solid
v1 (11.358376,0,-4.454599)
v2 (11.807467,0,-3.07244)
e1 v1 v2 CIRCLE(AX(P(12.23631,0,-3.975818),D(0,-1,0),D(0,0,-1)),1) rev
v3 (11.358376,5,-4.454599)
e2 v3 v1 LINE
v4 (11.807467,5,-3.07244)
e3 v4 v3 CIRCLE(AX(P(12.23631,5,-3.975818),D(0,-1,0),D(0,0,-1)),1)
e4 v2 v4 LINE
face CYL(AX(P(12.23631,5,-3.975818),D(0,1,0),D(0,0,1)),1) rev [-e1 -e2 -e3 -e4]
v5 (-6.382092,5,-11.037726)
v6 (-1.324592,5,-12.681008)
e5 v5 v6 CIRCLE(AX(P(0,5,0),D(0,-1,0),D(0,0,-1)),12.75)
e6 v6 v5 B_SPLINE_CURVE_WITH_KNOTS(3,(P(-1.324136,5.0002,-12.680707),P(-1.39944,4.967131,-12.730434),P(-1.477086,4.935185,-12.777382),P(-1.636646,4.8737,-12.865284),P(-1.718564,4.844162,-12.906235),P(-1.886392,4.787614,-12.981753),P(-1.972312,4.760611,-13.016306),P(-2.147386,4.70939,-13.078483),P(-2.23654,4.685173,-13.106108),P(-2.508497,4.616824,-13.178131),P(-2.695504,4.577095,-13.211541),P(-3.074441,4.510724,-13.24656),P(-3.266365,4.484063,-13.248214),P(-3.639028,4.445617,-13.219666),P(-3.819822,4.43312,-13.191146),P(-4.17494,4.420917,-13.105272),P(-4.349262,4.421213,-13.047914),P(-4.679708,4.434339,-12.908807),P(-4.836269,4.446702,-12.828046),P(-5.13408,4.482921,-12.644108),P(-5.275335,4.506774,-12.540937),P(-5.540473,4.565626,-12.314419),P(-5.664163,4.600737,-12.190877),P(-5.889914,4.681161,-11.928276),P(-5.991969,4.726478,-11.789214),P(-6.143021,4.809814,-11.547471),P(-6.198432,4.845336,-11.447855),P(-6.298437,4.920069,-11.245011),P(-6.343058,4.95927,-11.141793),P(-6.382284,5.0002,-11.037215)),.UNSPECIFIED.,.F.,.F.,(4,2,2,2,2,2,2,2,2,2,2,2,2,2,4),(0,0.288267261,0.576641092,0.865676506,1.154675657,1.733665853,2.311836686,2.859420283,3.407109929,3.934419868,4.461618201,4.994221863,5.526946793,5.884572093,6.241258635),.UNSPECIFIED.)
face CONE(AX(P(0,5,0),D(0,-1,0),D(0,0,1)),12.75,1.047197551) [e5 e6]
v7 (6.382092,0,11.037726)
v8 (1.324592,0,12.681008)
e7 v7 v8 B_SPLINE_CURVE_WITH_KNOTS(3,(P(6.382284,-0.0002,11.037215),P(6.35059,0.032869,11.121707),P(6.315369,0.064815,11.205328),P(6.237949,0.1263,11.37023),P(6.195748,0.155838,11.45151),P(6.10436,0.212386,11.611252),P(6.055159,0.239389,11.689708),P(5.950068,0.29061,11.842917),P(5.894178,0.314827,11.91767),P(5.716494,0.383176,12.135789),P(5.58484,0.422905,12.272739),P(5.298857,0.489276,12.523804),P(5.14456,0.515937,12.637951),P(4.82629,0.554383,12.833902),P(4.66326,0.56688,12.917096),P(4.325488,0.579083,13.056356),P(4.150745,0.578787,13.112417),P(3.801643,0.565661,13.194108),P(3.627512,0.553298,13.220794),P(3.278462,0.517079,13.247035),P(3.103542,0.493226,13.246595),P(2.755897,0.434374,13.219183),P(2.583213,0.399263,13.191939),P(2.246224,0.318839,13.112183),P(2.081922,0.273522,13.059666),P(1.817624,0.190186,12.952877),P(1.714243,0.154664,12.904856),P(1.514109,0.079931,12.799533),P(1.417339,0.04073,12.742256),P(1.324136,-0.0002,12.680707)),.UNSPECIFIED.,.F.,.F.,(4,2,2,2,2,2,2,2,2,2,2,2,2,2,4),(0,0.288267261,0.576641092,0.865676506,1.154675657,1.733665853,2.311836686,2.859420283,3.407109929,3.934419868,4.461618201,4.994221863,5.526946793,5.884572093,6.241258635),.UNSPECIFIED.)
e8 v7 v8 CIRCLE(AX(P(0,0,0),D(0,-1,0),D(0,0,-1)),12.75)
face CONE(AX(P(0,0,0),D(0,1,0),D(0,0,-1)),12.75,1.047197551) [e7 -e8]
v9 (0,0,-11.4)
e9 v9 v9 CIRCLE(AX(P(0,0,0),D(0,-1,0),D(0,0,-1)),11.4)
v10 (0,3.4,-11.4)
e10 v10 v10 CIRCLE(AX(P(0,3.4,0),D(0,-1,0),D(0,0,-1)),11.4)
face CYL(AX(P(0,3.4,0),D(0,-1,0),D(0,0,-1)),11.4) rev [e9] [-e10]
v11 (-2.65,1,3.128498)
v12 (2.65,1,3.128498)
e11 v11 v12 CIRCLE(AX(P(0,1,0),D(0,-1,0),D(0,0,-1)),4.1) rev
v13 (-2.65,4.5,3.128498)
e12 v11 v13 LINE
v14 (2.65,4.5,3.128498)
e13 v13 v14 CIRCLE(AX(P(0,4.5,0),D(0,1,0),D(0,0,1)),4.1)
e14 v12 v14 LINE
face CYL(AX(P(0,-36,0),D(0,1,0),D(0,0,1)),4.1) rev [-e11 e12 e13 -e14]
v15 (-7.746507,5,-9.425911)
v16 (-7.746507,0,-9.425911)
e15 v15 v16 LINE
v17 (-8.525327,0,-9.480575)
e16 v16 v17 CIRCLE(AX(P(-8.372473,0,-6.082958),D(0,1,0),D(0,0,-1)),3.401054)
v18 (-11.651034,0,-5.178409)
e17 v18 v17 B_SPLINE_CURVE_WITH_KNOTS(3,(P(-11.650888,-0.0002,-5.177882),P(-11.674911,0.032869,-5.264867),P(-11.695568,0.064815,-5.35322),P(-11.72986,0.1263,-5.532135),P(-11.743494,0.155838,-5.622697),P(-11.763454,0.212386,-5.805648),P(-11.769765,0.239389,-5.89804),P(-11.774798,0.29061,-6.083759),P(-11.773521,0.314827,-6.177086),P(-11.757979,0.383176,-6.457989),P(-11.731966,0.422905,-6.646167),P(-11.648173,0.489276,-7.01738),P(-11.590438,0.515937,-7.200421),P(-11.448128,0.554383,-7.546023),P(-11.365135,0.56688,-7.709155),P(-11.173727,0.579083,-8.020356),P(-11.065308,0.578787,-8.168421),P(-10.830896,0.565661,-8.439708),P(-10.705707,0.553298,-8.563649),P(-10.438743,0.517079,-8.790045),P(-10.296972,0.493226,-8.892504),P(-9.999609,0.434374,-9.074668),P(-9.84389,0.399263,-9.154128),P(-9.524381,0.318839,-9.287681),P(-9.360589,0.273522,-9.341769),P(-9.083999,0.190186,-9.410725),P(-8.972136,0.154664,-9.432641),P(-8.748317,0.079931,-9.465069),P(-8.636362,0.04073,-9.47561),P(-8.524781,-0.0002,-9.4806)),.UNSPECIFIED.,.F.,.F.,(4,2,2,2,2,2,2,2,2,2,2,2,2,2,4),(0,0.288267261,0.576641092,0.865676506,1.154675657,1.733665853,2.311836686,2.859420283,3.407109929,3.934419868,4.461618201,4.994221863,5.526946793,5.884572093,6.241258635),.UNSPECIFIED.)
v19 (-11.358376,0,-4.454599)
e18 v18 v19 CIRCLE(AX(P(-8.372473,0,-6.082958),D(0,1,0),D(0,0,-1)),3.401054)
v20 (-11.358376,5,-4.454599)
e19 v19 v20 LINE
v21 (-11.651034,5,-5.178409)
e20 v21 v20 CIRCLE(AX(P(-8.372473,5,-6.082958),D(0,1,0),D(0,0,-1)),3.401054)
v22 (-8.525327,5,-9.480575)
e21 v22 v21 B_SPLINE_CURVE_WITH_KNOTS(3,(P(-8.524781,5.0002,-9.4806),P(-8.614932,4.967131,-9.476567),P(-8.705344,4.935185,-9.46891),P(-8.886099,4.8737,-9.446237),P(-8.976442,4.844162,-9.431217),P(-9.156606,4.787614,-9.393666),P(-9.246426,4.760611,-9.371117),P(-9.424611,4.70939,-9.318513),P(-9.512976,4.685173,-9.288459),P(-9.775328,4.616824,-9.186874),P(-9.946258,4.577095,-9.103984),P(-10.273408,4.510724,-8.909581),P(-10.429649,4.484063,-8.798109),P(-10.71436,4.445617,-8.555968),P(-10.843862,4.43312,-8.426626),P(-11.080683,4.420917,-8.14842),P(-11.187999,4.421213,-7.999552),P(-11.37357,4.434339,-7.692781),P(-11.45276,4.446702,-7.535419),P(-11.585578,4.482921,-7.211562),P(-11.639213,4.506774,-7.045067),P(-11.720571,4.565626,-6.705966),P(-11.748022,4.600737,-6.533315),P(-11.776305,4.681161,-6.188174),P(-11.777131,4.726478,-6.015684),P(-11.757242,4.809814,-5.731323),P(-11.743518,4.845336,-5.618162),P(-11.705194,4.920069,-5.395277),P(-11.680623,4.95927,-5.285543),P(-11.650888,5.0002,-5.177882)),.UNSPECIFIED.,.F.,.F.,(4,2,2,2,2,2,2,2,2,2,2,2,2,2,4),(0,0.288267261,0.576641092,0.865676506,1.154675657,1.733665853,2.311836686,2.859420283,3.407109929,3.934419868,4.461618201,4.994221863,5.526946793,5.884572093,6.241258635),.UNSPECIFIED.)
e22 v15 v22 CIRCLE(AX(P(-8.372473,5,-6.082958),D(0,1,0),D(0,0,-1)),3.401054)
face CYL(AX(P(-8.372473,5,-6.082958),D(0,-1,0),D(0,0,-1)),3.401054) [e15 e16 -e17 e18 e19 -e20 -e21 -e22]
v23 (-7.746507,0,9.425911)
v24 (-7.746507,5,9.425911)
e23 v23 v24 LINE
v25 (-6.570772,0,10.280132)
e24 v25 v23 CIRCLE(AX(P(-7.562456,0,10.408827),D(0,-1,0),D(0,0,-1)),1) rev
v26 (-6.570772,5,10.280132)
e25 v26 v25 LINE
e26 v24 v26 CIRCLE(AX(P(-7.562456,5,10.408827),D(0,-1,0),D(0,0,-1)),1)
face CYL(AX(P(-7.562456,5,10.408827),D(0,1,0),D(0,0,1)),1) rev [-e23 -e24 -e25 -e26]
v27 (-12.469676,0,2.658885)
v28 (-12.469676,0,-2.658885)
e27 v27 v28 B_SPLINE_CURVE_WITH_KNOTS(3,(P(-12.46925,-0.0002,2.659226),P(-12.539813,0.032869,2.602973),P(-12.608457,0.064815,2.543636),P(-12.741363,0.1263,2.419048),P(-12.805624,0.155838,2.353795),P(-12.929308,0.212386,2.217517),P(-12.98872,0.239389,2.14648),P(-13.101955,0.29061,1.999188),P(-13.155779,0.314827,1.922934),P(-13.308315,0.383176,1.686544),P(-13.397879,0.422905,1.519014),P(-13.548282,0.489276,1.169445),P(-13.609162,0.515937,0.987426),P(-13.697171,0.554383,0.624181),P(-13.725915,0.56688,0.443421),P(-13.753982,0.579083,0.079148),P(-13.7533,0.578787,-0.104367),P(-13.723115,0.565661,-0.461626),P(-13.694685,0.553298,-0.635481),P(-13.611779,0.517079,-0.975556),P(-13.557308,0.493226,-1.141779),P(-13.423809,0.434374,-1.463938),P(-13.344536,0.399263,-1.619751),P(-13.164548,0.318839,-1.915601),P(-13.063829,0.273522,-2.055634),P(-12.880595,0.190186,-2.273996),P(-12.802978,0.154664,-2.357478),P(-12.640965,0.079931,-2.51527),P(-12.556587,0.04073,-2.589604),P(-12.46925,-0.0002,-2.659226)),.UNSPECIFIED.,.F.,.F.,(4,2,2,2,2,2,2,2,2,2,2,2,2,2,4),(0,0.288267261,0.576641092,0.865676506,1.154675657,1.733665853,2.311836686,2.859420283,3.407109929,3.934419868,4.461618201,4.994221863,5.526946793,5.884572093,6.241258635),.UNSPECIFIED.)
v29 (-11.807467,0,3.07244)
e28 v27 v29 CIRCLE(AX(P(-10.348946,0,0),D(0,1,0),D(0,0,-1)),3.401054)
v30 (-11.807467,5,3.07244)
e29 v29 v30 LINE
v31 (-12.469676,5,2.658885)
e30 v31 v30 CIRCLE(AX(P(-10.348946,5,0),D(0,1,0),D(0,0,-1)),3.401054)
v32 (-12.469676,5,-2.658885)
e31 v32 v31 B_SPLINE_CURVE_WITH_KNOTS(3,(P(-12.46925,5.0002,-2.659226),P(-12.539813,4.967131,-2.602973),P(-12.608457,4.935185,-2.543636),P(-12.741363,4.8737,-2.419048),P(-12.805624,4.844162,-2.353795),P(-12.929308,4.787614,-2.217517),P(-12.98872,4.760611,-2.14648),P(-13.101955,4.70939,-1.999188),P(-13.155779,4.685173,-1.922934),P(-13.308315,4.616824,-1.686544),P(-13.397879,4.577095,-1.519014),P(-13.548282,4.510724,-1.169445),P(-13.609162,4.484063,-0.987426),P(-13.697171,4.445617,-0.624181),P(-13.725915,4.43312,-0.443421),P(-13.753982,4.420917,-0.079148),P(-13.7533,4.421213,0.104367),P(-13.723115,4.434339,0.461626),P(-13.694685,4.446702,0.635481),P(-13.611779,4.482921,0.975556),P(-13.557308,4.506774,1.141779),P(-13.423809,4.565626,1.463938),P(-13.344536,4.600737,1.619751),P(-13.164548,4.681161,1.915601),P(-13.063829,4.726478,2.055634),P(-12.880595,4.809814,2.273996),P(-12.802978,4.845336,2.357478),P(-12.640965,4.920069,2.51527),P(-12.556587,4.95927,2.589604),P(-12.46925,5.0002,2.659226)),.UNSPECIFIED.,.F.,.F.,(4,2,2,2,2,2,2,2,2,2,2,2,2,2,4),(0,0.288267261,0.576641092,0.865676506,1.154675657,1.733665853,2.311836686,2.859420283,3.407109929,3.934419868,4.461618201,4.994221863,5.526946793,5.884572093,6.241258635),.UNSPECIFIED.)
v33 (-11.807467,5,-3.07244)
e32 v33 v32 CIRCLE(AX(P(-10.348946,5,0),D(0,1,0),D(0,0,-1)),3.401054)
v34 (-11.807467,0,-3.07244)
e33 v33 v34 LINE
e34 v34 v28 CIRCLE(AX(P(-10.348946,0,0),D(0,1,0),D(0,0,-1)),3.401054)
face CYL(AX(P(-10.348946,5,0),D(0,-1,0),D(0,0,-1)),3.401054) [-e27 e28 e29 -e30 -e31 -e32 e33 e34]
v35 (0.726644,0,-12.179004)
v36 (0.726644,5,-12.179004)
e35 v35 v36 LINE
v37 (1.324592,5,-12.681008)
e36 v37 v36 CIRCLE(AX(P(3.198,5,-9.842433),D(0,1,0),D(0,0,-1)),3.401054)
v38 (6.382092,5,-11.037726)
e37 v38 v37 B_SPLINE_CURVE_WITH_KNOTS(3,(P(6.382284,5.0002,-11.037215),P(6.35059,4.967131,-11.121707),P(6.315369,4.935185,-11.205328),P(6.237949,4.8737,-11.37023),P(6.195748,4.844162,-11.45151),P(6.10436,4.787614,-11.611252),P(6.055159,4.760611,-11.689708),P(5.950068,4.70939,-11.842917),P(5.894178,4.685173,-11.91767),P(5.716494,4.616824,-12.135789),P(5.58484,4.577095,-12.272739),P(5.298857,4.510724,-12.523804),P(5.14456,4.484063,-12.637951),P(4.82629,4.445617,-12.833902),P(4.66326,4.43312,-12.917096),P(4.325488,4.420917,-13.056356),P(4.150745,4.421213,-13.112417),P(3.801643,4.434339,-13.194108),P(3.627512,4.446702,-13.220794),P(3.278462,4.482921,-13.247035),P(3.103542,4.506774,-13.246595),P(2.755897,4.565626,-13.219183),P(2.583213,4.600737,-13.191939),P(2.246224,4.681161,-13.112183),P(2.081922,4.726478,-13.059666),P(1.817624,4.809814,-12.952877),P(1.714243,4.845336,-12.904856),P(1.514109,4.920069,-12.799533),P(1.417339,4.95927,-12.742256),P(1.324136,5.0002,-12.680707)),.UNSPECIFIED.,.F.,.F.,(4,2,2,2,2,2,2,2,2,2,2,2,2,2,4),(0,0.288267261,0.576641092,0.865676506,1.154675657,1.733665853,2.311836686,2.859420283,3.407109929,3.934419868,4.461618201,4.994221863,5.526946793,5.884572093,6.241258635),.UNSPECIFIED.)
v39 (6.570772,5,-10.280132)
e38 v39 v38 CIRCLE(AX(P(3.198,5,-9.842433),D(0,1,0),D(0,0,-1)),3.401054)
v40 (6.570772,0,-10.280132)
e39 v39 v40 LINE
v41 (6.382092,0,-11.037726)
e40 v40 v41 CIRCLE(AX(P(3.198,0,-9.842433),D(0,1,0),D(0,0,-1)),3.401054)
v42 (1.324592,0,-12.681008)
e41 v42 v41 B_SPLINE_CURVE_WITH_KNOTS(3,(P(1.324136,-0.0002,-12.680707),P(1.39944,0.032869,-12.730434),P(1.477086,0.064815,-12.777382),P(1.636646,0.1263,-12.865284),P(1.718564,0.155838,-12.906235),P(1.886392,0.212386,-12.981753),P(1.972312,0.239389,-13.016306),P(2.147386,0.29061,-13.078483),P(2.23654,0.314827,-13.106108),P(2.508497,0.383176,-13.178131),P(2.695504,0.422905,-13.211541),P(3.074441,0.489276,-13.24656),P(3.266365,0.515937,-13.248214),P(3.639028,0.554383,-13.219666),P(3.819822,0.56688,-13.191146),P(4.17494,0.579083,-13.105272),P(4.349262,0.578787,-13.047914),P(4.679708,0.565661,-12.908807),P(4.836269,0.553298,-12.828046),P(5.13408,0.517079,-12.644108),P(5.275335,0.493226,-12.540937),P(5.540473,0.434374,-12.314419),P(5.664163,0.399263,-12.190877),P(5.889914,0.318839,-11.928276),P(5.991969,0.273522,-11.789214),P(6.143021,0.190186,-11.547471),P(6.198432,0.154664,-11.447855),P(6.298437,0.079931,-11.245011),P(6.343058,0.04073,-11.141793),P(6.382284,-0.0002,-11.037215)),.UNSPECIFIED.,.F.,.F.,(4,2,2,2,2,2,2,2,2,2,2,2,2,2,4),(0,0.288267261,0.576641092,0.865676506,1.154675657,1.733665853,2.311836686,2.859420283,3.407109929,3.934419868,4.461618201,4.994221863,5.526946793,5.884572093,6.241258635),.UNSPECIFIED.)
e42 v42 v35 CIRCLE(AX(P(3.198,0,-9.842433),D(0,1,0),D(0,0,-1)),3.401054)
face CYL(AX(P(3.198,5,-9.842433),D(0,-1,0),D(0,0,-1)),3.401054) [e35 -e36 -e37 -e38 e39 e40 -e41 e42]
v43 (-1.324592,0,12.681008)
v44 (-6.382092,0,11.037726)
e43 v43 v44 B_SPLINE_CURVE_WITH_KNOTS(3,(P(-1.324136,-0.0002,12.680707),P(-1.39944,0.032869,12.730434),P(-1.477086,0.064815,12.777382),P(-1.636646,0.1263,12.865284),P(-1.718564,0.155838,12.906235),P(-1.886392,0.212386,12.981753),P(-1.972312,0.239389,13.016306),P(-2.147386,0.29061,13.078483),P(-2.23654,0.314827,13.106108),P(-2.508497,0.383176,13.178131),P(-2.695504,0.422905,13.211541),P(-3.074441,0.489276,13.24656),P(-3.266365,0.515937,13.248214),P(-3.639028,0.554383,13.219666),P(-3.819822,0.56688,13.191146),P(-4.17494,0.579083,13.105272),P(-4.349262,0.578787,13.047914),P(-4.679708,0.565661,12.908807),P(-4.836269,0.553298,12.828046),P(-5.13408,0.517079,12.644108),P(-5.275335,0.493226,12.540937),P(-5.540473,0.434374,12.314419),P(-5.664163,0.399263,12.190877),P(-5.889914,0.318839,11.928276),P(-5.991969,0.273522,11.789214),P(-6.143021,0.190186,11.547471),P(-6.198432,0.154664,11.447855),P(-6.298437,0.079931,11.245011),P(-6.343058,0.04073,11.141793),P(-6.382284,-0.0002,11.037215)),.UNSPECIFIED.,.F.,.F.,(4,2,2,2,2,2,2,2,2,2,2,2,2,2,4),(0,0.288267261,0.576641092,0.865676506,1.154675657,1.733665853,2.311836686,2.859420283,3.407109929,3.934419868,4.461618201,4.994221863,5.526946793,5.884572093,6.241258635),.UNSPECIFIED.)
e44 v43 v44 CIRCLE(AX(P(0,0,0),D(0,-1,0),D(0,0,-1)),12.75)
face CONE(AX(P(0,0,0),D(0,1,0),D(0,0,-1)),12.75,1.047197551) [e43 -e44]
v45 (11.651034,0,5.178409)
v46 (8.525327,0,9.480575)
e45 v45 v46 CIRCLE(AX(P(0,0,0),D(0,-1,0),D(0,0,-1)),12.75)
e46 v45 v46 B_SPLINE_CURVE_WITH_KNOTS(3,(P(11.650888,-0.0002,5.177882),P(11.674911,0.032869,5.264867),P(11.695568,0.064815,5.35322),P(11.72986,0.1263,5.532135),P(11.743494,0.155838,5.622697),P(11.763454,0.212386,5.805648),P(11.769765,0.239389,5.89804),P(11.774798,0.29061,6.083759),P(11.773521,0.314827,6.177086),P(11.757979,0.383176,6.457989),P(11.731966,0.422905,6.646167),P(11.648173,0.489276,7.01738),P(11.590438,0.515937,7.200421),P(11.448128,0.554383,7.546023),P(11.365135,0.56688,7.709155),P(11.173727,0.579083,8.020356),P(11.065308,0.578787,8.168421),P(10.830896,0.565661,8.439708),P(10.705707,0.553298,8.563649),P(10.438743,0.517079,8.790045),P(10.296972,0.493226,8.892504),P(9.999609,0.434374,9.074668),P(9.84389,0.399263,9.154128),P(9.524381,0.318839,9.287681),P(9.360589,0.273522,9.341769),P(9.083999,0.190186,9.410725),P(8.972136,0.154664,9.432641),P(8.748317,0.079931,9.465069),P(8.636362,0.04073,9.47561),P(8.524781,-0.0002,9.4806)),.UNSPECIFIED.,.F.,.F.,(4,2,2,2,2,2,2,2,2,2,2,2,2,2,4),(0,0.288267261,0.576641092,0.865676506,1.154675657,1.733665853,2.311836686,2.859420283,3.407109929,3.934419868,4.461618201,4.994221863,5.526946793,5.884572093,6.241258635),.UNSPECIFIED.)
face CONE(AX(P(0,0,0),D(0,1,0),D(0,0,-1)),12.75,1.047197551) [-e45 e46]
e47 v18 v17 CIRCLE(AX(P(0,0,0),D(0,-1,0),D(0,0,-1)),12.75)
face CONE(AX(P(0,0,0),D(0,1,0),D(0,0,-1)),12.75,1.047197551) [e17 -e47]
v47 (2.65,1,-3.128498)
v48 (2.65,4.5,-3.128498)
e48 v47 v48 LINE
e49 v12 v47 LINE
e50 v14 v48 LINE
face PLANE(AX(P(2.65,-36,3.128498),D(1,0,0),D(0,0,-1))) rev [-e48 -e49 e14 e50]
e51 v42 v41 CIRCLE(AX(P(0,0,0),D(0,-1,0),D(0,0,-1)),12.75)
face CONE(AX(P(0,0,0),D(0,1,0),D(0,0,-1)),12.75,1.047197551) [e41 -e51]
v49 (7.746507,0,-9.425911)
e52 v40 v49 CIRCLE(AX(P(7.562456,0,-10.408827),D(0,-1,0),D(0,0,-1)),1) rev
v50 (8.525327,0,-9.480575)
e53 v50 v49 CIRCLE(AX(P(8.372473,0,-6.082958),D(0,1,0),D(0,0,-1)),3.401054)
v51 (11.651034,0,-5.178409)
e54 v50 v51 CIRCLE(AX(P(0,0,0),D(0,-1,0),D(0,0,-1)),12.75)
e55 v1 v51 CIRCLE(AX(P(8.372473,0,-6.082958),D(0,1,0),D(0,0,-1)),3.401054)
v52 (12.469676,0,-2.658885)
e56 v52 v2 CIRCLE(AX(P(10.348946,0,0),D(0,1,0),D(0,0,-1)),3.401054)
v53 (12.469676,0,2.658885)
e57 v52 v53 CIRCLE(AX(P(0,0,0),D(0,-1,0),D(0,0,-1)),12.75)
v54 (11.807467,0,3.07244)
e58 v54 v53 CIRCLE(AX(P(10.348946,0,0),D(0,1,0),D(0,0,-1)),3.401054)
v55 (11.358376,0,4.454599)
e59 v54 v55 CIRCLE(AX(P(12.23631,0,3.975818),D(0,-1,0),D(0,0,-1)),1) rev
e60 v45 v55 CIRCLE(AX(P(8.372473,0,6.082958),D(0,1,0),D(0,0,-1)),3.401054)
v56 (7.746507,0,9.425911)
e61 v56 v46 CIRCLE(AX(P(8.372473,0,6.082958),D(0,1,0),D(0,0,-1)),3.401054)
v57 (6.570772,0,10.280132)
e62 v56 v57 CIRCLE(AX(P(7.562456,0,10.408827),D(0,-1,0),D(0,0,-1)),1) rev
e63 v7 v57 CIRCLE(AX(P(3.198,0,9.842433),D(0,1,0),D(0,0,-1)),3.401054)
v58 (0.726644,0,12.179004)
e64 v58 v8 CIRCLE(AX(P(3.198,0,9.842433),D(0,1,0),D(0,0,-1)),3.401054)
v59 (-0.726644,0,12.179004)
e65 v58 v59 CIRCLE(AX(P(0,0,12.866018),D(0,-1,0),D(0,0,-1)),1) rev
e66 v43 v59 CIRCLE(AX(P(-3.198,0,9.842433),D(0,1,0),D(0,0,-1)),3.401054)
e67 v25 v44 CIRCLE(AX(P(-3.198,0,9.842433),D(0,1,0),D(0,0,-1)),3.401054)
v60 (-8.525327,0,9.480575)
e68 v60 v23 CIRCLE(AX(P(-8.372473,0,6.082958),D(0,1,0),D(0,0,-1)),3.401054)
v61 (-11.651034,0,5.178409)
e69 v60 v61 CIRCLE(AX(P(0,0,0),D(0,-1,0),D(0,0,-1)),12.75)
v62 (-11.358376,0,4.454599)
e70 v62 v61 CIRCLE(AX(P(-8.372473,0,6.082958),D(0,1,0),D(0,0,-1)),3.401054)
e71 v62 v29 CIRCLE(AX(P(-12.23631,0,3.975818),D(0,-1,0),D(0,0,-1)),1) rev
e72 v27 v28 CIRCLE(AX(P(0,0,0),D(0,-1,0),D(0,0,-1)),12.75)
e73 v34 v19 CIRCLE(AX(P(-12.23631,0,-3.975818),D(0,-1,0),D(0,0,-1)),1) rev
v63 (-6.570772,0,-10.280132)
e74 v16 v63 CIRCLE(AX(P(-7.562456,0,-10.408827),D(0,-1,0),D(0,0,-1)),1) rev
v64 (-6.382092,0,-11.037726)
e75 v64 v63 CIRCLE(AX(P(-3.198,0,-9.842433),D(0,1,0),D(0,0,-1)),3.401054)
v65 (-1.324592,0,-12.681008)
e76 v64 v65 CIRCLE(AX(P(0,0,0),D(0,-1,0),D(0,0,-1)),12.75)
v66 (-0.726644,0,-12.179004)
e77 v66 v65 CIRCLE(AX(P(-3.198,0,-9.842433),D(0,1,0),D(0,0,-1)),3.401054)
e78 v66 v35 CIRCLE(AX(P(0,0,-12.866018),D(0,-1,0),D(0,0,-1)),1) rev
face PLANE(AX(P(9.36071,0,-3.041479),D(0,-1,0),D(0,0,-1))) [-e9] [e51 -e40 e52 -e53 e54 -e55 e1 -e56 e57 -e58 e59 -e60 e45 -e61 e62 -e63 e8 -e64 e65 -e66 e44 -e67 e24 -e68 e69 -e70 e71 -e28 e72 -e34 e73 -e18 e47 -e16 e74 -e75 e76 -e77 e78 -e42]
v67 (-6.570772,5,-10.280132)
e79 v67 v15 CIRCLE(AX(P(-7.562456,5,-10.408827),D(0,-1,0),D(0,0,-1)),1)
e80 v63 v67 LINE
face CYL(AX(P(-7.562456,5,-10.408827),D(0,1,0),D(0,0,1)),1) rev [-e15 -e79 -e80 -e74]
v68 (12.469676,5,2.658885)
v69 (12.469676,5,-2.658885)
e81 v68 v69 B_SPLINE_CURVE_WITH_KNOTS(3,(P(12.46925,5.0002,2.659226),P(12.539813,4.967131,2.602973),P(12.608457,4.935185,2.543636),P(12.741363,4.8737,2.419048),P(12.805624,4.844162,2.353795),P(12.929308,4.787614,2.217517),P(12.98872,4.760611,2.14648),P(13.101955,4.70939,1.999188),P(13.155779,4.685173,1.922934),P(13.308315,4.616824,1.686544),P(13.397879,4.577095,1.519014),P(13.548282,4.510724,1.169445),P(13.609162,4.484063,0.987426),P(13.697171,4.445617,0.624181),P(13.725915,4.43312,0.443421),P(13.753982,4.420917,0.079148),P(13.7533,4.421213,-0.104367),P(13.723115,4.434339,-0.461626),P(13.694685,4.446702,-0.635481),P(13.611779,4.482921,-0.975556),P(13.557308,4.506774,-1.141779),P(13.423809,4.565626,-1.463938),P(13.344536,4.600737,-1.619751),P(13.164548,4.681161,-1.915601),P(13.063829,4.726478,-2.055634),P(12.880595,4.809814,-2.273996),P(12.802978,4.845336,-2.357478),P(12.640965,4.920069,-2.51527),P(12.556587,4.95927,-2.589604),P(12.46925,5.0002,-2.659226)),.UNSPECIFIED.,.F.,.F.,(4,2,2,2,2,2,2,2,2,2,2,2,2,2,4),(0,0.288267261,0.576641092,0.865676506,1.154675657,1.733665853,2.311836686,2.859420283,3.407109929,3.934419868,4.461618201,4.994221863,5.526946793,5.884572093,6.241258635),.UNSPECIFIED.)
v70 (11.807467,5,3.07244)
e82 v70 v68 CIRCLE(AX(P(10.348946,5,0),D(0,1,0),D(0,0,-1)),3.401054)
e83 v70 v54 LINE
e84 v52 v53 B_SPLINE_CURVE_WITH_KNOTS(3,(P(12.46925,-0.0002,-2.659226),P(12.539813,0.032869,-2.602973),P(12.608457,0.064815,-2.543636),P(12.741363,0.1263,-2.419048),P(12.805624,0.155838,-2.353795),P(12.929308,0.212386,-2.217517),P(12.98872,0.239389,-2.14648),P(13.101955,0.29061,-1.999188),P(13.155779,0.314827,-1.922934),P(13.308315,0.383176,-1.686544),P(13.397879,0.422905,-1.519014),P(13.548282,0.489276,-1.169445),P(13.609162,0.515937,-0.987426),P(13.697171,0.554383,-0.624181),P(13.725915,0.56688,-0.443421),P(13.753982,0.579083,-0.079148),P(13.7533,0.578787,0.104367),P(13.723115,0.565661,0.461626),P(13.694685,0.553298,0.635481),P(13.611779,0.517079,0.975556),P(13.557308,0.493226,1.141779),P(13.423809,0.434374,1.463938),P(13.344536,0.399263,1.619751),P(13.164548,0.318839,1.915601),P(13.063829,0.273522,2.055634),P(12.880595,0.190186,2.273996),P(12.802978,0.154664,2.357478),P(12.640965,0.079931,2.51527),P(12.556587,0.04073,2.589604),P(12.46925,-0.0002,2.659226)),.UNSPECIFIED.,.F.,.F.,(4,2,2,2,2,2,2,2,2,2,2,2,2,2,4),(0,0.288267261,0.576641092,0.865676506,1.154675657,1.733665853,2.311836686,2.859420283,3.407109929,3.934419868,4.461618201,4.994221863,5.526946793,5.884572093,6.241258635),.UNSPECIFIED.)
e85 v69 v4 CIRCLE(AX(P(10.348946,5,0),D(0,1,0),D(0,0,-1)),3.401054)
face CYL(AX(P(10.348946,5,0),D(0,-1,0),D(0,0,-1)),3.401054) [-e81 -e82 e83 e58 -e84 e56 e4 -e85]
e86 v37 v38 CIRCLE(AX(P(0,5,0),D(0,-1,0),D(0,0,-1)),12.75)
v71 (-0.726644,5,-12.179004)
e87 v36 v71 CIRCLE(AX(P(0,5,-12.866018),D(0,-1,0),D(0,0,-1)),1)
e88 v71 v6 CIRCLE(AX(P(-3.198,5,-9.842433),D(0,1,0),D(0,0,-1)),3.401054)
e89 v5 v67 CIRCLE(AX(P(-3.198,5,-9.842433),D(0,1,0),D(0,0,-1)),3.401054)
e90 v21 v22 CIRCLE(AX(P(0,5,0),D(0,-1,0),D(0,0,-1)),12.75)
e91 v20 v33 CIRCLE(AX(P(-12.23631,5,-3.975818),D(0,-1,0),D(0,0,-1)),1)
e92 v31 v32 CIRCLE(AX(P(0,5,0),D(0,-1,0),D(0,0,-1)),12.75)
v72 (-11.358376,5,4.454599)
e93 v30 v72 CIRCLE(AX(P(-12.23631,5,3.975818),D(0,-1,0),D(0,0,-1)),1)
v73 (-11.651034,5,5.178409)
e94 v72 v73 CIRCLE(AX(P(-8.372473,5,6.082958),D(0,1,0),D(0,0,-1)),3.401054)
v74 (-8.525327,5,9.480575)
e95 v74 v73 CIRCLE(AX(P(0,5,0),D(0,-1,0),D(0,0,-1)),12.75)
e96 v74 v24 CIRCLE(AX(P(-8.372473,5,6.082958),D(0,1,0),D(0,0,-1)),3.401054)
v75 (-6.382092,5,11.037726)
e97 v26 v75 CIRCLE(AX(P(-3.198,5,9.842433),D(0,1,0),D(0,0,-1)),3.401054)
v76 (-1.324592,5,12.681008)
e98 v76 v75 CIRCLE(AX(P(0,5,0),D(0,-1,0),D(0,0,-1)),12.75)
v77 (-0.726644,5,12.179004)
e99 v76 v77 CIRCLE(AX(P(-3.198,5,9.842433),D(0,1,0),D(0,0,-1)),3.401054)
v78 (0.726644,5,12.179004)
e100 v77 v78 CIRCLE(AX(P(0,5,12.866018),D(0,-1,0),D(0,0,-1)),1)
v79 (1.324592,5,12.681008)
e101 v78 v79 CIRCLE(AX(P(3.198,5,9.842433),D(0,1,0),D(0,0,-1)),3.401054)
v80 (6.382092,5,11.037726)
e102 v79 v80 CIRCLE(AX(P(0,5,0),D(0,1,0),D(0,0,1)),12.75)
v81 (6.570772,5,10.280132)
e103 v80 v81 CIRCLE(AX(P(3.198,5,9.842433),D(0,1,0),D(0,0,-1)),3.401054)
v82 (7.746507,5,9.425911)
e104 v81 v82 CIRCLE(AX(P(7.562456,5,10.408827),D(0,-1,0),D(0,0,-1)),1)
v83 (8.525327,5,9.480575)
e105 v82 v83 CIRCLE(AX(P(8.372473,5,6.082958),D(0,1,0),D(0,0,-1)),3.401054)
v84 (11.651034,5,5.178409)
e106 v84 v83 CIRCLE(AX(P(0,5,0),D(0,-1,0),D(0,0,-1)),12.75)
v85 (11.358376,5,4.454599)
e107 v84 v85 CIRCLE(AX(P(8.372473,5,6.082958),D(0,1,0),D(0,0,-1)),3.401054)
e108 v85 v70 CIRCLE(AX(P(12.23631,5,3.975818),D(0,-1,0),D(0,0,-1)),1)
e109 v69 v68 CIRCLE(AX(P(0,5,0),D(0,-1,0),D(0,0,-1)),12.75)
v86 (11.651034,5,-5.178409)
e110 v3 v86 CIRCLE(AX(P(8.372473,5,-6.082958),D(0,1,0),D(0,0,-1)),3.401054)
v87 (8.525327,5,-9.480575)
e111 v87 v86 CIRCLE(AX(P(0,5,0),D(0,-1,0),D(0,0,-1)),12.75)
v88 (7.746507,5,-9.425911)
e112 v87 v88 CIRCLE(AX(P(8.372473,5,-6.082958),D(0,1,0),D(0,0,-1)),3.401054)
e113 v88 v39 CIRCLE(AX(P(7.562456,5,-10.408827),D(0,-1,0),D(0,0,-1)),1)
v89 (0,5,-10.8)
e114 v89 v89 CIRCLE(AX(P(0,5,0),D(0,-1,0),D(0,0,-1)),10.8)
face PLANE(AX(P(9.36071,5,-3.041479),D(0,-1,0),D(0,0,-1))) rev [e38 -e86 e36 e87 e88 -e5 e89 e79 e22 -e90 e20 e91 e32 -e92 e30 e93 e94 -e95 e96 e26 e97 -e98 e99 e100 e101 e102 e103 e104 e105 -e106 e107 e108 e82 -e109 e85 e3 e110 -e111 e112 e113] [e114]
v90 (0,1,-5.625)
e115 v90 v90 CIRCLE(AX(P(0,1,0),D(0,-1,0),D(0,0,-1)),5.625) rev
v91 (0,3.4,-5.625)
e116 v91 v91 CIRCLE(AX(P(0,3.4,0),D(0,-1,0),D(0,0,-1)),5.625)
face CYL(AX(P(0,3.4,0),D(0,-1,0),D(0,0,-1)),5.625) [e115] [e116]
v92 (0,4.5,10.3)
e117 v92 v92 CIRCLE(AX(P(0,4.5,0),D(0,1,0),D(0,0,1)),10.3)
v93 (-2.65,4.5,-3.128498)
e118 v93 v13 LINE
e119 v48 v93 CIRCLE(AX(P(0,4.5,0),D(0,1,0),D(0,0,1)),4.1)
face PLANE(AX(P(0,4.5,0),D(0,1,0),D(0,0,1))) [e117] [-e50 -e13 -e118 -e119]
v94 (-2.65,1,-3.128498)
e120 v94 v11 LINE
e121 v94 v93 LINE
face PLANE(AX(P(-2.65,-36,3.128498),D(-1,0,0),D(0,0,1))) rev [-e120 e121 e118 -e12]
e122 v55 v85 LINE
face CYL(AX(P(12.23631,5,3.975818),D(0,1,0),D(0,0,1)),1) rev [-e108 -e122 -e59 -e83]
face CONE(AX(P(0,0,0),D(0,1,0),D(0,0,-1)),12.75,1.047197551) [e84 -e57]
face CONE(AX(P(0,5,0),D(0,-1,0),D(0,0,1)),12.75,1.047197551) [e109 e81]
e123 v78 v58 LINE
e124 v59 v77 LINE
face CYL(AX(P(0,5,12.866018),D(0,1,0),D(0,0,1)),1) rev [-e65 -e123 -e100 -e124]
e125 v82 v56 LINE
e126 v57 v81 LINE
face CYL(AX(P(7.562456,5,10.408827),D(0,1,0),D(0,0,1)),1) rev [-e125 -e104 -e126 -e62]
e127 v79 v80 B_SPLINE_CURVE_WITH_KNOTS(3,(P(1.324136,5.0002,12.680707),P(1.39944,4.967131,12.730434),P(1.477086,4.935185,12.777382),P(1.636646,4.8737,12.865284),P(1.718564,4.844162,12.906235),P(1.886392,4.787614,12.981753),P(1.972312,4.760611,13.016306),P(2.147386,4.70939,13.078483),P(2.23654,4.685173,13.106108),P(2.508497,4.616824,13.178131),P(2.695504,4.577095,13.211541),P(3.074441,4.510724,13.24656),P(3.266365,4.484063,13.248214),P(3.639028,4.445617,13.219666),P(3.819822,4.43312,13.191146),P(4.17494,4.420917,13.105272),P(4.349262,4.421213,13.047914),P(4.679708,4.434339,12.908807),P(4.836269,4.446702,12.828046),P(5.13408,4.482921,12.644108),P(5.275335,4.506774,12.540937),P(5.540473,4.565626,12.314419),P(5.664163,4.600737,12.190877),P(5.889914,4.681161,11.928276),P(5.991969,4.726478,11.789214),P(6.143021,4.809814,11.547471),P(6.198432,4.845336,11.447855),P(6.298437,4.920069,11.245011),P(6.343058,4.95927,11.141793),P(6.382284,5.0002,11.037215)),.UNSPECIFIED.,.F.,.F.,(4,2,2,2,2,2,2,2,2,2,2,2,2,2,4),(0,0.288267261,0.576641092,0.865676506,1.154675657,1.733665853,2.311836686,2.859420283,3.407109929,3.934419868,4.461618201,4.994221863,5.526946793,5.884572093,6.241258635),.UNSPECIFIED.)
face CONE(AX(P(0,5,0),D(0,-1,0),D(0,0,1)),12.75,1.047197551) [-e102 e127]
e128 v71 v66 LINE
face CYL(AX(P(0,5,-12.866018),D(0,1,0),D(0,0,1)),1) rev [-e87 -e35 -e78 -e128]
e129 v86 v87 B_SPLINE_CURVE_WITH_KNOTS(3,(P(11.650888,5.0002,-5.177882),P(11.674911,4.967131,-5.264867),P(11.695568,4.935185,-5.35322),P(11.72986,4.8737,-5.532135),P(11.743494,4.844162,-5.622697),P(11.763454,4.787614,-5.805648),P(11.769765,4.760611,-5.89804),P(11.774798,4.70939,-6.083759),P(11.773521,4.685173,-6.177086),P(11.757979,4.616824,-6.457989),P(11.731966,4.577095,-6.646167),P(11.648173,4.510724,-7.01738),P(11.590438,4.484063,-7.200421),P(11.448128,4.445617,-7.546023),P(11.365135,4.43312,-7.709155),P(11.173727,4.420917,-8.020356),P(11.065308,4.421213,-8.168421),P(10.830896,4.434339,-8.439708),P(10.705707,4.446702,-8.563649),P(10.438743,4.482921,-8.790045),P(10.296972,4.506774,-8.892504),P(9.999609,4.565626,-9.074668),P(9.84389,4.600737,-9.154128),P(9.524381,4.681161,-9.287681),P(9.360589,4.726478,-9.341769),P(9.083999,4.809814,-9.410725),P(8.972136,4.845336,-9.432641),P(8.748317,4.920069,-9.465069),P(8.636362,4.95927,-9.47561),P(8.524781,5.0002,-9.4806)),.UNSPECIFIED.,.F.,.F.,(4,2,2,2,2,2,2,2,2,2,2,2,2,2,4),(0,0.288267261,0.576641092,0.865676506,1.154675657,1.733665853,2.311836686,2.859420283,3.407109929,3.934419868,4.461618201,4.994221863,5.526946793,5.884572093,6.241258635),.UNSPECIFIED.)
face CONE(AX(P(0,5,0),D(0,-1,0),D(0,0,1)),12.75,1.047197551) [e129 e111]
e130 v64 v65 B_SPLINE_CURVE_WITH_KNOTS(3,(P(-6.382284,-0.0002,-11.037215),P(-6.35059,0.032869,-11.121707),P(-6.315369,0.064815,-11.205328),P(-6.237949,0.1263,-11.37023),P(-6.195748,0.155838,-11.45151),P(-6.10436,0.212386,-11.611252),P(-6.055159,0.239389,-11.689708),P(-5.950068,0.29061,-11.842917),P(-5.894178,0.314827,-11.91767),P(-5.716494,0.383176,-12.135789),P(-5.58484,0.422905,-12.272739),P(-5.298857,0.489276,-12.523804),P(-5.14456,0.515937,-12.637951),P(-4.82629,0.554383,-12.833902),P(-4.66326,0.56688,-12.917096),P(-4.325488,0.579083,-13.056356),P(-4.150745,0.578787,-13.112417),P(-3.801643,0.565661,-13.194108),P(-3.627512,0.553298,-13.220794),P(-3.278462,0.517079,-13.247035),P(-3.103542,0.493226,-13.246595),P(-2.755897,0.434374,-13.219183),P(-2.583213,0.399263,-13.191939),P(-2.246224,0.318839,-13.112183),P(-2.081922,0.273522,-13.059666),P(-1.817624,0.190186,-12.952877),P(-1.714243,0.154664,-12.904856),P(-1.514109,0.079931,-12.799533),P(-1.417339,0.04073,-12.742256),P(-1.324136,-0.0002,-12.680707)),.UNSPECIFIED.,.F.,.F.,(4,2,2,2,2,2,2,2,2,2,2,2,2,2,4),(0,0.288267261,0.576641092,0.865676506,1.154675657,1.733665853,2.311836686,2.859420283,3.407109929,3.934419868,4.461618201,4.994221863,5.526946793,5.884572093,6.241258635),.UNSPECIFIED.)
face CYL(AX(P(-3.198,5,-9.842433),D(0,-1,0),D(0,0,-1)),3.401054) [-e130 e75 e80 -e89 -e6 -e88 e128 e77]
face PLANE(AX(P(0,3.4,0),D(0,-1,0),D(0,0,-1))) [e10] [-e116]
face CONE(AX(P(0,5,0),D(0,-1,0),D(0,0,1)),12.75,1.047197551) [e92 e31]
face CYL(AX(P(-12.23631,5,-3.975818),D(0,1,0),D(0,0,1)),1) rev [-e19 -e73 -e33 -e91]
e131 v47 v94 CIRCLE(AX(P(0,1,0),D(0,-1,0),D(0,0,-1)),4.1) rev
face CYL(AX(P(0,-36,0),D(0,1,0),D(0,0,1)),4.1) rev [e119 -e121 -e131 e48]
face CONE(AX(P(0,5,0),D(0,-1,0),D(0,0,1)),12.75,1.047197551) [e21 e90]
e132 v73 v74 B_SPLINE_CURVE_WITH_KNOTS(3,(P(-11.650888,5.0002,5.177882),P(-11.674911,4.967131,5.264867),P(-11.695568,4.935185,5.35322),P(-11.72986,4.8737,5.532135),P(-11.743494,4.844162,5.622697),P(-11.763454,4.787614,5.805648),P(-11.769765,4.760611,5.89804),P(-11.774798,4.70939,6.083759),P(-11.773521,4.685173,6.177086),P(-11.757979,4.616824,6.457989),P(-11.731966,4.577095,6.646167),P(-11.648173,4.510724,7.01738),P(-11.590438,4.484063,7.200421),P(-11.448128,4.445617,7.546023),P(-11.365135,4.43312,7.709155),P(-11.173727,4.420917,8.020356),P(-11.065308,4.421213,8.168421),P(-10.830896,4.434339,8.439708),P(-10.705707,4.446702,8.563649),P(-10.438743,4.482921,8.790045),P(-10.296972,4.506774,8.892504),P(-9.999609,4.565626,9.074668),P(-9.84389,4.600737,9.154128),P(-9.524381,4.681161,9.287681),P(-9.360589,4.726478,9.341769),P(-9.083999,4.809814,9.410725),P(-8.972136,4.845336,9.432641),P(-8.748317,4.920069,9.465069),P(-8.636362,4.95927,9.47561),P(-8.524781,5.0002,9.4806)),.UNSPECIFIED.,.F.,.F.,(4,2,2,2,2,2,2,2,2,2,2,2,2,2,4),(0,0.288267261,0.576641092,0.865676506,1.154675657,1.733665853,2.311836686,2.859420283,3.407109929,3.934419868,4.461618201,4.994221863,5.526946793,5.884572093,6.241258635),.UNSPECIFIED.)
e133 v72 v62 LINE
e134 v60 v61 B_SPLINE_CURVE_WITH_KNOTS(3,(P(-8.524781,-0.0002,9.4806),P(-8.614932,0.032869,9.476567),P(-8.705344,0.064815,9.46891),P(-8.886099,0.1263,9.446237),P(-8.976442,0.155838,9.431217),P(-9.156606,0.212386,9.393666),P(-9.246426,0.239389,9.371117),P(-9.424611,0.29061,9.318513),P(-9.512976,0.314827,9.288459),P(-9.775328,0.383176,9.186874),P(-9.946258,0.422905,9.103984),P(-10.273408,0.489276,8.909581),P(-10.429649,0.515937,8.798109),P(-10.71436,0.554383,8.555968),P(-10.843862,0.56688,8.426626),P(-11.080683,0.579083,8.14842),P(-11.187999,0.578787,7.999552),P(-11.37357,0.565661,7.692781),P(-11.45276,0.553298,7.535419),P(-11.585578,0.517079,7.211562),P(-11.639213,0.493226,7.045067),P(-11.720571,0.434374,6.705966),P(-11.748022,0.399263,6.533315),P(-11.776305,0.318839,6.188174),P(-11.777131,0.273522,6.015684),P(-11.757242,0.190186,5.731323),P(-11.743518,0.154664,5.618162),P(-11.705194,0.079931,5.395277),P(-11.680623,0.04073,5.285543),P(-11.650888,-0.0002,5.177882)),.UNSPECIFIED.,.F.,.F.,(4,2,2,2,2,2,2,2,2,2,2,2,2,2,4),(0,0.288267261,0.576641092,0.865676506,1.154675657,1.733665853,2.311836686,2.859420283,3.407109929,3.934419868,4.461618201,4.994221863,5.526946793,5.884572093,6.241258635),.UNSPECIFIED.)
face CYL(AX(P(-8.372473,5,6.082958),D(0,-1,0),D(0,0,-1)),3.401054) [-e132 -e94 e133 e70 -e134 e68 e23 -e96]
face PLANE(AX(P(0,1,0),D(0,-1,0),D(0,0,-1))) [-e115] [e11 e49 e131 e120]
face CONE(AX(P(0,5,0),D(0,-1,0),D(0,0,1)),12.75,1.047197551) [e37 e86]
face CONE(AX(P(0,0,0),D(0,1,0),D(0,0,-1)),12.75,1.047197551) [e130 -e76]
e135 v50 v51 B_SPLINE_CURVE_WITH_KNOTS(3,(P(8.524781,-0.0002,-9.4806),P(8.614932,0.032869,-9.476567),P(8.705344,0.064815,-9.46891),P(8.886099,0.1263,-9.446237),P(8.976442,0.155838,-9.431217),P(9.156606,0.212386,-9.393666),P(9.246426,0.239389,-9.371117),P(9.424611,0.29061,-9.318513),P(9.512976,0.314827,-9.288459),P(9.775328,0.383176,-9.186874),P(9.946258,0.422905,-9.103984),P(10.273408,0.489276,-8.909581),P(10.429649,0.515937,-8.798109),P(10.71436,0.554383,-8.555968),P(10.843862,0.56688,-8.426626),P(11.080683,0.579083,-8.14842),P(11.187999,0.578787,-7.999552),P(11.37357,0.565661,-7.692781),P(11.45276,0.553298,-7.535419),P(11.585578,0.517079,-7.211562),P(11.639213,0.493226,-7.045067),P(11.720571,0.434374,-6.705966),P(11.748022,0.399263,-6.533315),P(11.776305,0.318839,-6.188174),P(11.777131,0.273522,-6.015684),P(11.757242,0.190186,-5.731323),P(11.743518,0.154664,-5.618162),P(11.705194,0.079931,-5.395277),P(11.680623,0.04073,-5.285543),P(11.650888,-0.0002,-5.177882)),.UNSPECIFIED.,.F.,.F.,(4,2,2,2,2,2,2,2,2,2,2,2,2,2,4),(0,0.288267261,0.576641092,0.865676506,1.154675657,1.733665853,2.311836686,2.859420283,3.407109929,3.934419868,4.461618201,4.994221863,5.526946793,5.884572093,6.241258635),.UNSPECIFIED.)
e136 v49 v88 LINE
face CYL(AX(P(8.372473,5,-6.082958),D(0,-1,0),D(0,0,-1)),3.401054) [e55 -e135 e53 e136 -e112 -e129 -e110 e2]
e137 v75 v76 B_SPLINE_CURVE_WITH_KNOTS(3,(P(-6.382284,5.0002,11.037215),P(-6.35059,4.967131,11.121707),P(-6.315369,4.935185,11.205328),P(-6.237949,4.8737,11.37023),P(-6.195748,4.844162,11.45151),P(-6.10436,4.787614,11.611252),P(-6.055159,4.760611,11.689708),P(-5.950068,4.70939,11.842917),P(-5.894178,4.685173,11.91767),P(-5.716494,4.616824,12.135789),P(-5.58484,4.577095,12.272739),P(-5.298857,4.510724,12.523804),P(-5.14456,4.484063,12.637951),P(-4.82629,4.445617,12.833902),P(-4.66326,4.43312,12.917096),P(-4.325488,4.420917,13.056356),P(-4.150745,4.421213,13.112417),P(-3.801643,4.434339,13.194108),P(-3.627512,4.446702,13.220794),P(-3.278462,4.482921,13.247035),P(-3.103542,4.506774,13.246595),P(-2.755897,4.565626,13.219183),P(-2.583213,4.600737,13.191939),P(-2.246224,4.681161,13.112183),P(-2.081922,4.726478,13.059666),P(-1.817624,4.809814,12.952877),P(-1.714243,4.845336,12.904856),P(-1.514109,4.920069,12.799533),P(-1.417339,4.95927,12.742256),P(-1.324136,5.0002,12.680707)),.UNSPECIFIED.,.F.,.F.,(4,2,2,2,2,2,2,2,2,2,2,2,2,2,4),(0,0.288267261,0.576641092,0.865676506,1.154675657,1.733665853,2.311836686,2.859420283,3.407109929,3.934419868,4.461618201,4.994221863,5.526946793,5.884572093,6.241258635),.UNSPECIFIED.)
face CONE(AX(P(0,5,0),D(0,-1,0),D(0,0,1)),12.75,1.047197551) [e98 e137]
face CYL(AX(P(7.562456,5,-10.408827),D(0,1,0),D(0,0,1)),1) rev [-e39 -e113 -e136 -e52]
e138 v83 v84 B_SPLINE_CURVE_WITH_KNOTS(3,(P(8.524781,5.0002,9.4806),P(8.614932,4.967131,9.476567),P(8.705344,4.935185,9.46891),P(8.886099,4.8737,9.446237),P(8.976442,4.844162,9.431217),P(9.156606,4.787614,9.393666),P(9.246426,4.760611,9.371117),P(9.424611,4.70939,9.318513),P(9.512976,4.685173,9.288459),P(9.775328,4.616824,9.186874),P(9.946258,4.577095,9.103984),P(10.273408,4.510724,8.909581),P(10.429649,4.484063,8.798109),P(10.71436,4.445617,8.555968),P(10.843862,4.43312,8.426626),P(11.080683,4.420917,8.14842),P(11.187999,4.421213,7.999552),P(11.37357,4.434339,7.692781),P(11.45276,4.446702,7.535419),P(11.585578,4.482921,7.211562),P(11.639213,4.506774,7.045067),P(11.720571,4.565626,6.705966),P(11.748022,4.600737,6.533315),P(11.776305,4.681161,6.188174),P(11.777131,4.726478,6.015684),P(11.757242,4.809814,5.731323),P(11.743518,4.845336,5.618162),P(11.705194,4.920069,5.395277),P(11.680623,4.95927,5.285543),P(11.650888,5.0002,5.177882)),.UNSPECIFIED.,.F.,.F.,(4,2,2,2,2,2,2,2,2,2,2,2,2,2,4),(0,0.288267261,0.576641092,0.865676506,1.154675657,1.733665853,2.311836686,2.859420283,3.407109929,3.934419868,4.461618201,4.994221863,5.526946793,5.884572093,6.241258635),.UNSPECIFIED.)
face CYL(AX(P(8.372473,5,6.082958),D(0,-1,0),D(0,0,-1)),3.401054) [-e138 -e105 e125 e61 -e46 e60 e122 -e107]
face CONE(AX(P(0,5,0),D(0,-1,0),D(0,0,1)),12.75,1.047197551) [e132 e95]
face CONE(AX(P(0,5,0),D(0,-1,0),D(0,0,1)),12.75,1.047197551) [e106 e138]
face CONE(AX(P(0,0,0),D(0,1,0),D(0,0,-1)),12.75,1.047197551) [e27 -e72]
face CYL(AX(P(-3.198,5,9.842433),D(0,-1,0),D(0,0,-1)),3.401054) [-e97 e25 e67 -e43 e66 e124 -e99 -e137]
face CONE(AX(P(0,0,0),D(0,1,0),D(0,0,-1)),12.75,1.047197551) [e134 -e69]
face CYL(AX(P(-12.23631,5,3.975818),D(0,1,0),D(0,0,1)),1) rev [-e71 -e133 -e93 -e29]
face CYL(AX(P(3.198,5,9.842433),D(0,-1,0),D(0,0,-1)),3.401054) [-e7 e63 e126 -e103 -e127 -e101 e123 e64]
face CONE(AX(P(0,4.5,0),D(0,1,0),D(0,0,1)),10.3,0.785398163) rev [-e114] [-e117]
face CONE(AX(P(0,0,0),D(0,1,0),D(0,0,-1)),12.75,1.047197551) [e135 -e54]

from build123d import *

# Parameters (mm, degrees)
BOSS_EXTRUDE1_DEPTH = 5
FILLET2_R           = 1
SKETCH5_R           = 10.3
CUT_EXTRUDE1_DEPTH  = 0.5
CHAMFER1_SIZE       = 0.5
SKETCH6_OUTSIDE_W   = 384.304
SKETCH6_OUTSIDE_H   = 383.29
SKETCH6_OUTSIDE_R   = 12.75
CUT_EXTRUDE2_DEPTH  = 100.2
CUT_EXTRUDE2_DRAFT  = -60
SKETCH7_OUTSIDE_W   = 177.498
SKETCH7_OUTSIDE_H   = 176.484
SKETCH7_OUTSIDE_R   = 12.75
CUT_EXTRUDE3_DEPTH  = 40.5
CUT_EXTRUDE3_DRAFT  = -60
CUT_EXTRUDE4_DEPTH  = 40.5
SKETCH9_R           = 11.4
SKETCH9_R_2         = 5.625
CUT_EXTRUDE5_DEPTH  = 3.4
SKETCH10_R          = 6
CUT_EXTRUDE6_DEPTH  = 1


with BuildPart() as part:
    # Sketch1 → Boss-Extrude1 (new body)
    with BuildSketch(Plane(origin=(0, 0, 0), x_dir=(1, 0, 0), z_dir=(0, 1, 0))):
        with BuildLine():
            ThreePointArc((0, 11), (4.248983673, 13.077027099), (6.465637775, 8.899186938))
            ThreePointArc((6.465637775, 8.899186938), (11.123983673, 8.082047219), (10.461621679, 3.399186938))
            ThreePointArc((10.461621679, 3.399186938), (13.75, 0), (10.461621679, -3.399186938))
            ThreePointArc((10.461621679, -3.399186938), (11.123983673, -8.082047219), (6.465637775, -8.899186938))
            ThreePointArc((6.465637775, -8.899186938), (4.248983673, -13.077027099), (0, -11))
            ThreePointArc((0, -11), (-4.248983673, -13.077027099), (-6.465637775, -8.899186938))
            ThreePointArc((-6.465637775, -8.899186938), (-11.123983673, -8.082047219), (-10.461621679, -3.399186938))
            ThreePointArc((-10.461621679, -3.399186938), (-13.75, 0), (-10.461621679, 3.399186938))
            ThreePointArc((-10.461621679, 3.399186938), (-11.123983673, 8.082047219), (-6.465637775, 8.899186938))
            ThreePointArc((-6.465637775, 8.899186938), (-4.248983673, 13.077027099), (0, 11))
        make_face()
    extrude(amount=BOSS_EXTRUDE1_DEPTH)

    # Fillet2
    fillet2_edges = [part.edges().sort_by_distance(p)[0] for p in [
        (10.461621679, 2.5, -3.399186938),
        (10.461621679, 2.5, 3.399186938),
        (6.465637775, 2.5, 8.899186938),
        (0, 2.5, 11),
        (-6.465637775, 2.5, 8.899186938),
        (-10.461621679, 2.5, 3.399186938),
        (-10.461621679, 2.5, -3.399186938),
        (-6.465637775, 2.5, -8.899186938),
        (0, 2.5, -11),
        (6.465637775, 2.5, -8.899186938),
    ]]
    fillet(fillet2_edges, radius=FILLET2_R)

    # Sketch5 → Cut-Extrude1 (cut)
    with BuildSketch(Plane(origin=(0, 5, 0), x_dir=(1, 0, 0), z_dir=(0, 1, 0))):
        with Locations(Location((0, 0, 0), (0, 0, 270))):
            Circle(SKETCH5_R)
    extrude(amount=-CUT_EXTRUDE1_DEPTH, mode=Mode.SUBTRACT)

    # Chamfer1
    chamfer1_edges = [part.edges().sort_by_distance(p)[0] for p in [
        (0, 5, -10.3),
    ]]
    chamfer(chamfer1_edges, length=CHAMFER1_SIZE - 0.0001)  # a hair under: the kernel refuses the full size


with BuildPart() as cut_extrude2_tool:
    # Sketch6 outside → Cut-Extrude2 (with draft: the straight prism first)
    with BuildSketch(Plane(origin=(0, 5, 0), x_dir=(1, 0, 0), z_dir=(0, 1, 0))):
        Rectangle(SKETCH6_OUTSIDE_W, SKETCH6_OUTSIDE_H)
        Circle(SKETCH6_OUTSIDE_R, mode=Mode.SUBTRACT)
    extrude(amount=-CUT_EXTRUDE2_DEPTH)
    # Cut-Extrude2: the draft: its side faces are tilted about the plane it starts from
    cut_extrude2_sides = [cut_extrude2_tool.faces().sort_by_distance(p)[0] for p in [
        (0, -45.1, 191.645),
        (192.152, -45.1, 0),
        (0, -45.1, -191.645),
        (-192.152, -45.1, 0),
        (-12.75, -45.1, 0),
    ]]
    draft(cut_extrude2_sides, Plane(origin=(0, 5, 0), x_dir=(1, 0, 0), z_dir=(0, 1, 0)), CUT_EXTRUDE2_DRAFT)


with BuildPart() as part_1:
    add(part.part)

    # Cut-Extrude2: cut by cut_extrude2_tool
    add(cut_extrude2_tool.part, mode=Mode.SUBTRACT)


with BuildPart() as cut_extrude3_tool:
    # Sketch7 outside → Cut-Extrude3 (with draft: the straight prism first)
    with BuildSketch(Plane.XZ):
        Rectangle(SKETCH7_OUTSIDE_W, SKETCH7_OUTSIDE_H)
        Circle(SKETCH7_OUTSIDE_R, mode=Mode.SUBTRACT)
    extrude(amount=-CUT_EXTRUDE3_DEPTH)
    # Cut-Extrude3: the draft: its side faces are tilted about the plane it starts from
    cut_extrude3_sides = [cut_extrude3_tool.faces().sort_by_distance(p)[0] for p in [
        (0, 20.25, -88.242),
        (88.749, 20.25, 0),
        (0, 20.25, 88.242),
        (-88.749, 20.25, 0),
        (-12.75, 20.25, 0),
    ]]
    draft(cut_extrude3_sides, Plane.XZ, CUT_EXTRUDE3_DRAFT)


with BuildPart() as part_2:
    add(part_1.part)

    # Cut-Extrude3: cut by cut_extrude3_tool
    add(cut_extrude3_tool.part, mode=Mode.SUBTRACT)

    # Sketch8 → Cut-Extrude4 (cut)
    with BuildSketch(Plane(origin=(0, 4.5, 0), x_dir=(1, 0, 0), z_dir=(0, 1, 0))):
        with BuildLine():
            Line((-2.65, -3.128498042), (-2.65, 3.128498042))
            ThreePointArc((-2.65, 3.128498042), (0, 4.1), (2.65, 3.128498042))
            Line((2.65, 3.128498042), (2.65, -3.128498042))
            ThreePointArc((2.65, -3.128498042), (0, -4.1), (-2.65, -3.128498042))
        make_face()
    extrude(amount=-CUT_EXTRUDE4_DEPTH, mode=Mode.SUBTRACT)

    # Sketch9 → Cut-Extrude5 (cut)
    with BuildSketch(Plane.XZ):
        with Locations(Location((0, 0, 0), (0, 0, 270))):
            Circle(SKETCH9_R)
        with Locations(Location((0, 0, 0), (0, 0, 270))):
            Circle(SKETCH9_R_2, mode=Mode.SUBTRACT)
    extrude(amount=-CUT_EXTRUDE5_DEPTH, mode=Mode.SUBTRACT)

    # Sketch10 → Cut-Extrude6 (cut)
    with BuildSketch(Plane.XZ):
        Circle(SKETCH10_R)
    extrude(amount=-CUT_EXTRUDE6_DEPTH, mode=Mode.SUBTRACT)


solid = part_2.part
